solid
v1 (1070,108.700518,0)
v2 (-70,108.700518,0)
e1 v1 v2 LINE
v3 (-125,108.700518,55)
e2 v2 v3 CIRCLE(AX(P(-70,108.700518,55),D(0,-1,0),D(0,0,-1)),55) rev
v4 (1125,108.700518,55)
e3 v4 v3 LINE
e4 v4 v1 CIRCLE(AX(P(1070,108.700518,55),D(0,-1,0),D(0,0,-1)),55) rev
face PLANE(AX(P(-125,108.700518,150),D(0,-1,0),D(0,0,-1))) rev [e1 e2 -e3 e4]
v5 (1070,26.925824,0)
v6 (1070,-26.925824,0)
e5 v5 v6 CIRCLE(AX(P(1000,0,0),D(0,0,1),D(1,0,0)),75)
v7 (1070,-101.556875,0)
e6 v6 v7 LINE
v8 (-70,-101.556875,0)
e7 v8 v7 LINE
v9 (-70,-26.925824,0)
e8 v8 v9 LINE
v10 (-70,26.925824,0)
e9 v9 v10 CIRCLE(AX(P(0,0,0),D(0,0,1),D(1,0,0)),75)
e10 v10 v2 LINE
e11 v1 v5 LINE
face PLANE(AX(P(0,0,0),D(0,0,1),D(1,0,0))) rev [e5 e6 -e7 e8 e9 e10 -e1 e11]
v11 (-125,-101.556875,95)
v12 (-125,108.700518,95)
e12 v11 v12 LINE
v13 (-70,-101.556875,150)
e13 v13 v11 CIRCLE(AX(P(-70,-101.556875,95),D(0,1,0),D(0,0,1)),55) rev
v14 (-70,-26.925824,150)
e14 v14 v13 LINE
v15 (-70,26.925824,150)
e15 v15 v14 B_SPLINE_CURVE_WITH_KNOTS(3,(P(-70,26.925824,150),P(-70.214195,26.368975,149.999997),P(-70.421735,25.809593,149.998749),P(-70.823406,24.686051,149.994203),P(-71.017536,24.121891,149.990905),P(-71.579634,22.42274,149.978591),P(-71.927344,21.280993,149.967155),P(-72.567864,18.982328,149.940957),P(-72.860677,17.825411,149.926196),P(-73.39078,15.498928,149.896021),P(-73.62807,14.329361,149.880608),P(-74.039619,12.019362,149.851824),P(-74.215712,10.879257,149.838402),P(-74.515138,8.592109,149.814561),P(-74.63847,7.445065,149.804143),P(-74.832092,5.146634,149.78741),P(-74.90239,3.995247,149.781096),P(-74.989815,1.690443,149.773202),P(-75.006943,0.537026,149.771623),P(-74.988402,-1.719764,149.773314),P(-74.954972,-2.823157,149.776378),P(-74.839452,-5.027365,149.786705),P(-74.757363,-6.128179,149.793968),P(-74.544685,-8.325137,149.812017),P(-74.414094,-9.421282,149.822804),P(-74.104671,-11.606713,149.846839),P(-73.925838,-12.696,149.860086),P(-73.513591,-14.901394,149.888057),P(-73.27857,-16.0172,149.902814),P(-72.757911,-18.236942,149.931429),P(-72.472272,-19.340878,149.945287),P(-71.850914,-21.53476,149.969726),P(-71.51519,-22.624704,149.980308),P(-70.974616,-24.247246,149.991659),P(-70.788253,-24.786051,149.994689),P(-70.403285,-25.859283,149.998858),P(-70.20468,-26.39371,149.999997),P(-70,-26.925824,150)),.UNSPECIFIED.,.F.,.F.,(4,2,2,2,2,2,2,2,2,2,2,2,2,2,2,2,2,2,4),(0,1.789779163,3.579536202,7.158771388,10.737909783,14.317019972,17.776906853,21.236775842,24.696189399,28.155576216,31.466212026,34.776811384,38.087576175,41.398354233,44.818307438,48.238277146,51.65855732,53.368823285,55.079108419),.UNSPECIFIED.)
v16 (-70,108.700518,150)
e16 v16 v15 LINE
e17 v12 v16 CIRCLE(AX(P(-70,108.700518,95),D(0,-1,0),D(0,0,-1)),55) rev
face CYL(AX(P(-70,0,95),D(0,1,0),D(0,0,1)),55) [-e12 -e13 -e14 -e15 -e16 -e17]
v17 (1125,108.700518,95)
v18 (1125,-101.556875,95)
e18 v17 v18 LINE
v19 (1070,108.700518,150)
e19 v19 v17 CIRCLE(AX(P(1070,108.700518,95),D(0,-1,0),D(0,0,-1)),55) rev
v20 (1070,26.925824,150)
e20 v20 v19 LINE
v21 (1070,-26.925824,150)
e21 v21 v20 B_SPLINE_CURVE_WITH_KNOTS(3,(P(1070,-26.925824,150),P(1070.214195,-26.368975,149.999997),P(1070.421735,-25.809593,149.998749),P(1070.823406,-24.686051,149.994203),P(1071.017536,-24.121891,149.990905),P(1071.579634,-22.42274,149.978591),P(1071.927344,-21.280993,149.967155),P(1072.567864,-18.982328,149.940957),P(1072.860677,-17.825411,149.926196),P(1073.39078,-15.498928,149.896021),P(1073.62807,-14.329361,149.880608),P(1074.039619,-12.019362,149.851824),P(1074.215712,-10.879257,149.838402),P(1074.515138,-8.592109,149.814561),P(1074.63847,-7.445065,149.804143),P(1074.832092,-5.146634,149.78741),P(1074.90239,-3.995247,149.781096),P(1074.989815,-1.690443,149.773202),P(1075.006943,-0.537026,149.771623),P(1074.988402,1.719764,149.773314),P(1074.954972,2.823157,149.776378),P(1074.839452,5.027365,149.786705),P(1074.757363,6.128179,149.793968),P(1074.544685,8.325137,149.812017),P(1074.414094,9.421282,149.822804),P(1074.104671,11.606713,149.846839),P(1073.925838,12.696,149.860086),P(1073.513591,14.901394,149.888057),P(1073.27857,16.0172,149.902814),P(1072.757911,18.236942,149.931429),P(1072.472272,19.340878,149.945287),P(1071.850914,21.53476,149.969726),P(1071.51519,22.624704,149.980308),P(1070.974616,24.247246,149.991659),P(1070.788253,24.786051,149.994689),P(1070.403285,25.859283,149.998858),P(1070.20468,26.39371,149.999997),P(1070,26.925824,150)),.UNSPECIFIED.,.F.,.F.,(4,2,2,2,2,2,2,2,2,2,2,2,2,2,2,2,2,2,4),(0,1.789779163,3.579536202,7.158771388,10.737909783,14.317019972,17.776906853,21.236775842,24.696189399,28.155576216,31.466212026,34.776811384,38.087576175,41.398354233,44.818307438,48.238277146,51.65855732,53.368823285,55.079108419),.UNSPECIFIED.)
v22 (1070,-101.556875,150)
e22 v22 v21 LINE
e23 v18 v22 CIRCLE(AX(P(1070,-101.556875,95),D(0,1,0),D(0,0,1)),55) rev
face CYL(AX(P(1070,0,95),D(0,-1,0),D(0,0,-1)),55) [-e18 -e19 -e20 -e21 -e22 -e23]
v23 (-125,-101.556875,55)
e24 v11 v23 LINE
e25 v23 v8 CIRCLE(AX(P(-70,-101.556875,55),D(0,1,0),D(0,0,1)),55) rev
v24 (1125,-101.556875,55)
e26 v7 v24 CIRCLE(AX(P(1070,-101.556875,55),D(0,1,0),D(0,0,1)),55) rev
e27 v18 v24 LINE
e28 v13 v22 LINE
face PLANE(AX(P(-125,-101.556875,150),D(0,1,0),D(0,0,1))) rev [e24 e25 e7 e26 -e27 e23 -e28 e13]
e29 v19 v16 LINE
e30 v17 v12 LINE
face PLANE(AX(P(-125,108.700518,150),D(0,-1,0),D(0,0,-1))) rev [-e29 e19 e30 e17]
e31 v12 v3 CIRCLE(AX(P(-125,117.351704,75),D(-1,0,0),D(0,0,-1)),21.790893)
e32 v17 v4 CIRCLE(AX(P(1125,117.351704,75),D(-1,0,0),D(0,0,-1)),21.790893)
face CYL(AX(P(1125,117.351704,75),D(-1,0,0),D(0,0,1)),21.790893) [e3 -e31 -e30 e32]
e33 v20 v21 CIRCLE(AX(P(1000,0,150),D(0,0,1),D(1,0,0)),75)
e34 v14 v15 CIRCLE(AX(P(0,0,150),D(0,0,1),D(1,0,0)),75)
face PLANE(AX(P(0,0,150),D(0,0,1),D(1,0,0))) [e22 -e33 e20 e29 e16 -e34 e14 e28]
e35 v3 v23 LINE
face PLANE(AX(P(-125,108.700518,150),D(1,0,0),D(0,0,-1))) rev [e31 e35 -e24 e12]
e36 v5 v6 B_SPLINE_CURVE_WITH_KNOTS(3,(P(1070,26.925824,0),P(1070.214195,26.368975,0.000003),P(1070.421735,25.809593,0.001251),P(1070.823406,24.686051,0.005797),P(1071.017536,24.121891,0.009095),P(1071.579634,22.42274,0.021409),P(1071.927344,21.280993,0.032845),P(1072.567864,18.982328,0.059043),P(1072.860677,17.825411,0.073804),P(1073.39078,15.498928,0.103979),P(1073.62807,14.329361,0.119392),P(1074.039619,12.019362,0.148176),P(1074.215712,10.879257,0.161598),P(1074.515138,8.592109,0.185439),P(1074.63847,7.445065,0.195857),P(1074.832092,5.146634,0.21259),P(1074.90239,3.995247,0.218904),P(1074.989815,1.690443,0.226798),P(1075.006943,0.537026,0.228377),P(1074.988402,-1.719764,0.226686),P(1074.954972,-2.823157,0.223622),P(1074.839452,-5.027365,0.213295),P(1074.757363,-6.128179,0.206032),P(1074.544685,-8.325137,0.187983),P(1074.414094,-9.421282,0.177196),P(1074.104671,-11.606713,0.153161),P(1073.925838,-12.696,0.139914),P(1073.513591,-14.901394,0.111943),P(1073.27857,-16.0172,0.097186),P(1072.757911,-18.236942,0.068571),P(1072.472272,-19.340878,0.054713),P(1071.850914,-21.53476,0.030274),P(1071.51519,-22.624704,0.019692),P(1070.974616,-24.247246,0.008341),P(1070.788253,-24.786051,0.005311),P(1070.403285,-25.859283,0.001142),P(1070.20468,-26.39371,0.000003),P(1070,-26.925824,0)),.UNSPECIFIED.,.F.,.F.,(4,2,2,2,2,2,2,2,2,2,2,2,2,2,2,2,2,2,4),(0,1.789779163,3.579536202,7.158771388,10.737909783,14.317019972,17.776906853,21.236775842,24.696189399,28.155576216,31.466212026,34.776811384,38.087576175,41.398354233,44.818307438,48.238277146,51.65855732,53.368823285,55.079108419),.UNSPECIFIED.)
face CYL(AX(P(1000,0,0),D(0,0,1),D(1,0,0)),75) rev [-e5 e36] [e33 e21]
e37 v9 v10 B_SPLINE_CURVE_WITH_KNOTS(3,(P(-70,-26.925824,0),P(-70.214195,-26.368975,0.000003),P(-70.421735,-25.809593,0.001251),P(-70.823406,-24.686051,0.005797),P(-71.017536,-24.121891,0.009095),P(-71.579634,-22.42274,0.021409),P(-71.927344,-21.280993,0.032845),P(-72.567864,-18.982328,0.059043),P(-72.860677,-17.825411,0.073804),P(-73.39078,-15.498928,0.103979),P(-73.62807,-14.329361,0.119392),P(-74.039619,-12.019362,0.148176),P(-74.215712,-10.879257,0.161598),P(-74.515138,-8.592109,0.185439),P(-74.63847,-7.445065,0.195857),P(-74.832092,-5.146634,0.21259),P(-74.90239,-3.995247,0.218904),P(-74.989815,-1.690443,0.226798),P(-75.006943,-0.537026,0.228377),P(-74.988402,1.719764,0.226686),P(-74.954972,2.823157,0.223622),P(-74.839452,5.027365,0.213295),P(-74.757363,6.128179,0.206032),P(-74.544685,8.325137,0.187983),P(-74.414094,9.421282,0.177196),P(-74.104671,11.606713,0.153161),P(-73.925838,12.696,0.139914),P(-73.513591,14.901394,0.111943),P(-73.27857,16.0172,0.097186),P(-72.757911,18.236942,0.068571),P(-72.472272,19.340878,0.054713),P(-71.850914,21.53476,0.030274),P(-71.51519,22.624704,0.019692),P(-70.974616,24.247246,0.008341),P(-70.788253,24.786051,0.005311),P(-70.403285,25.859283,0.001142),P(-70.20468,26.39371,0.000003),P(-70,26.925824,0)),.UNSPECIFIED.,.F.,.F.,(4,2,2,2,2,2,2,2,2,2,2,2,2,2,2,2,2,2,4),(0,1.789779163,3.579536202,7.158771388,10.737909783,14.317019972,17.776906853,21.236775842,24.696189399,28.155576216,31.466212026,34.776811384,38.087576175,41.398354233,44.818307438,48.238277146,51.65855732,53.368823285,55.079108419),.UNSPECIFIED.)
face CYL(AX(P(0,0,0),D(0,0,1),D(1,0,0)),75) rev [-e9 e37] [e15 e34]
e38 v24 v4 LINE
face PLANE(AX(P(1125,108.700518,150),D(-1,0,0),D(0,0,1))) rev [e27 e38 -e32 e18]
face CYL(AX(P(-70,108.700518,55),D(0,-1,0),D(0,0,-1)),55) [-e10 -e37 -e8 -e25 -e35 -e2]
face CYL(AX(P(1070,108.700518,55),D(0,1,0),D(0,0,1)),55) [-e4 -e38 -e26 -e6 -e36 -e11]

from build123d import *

# Parameters (mm, degrees)
SKETCH1_W           = 1250
SKETCH1_H           = 210.257392811
BOSS_EXTRUDE1_DEPTH = 150
SKETCH2_R           = 75
CUT_EXTRUDE1_DEPTH  = 150
FILLET3_R           = 55
BOSS_EXTRUDE2_DEPTH = 1250


with BuildPart() as part:
    # Sketch1 → Boss-Extrude1 (new body)
    with BuildSketch(Plane.XY):
        with Locations((500, 3.571821645)):
            Rectangle(SKETCH1_W, SKETCH1_H)
    extrude(amount=BOSS_EXTRUDE1_DEPTH)

    # Sketch2 → Cut-Extrude1 (cut)
    with BuildSketch(Plane.XY.offset(150)):
        Circle(SKETCH2_R)
        with Locations((1000, 0)):
            Circle(SKETCH2_R)
    extrude(amount=-CUT_EXTRUDE1_DEPTH, mode=Mode.SUBTRACT)

    # Fillet3
    # the kernel refuses this fillet: 55 mm, written as the material it takes off along each edge
    with BuildSketch(Plane(origin=(1125, 246.20051805, 150), x_dir=(0, 0, -1), z_dir=(0, -1, 0)), Plane(origin=(-125, -239.056874761, 150), x_dir=(0, 0, -1), z_dir=(0, 1, 0))) as fillet3_piece_1:
        with BuildLine():
            CenterArc((FILLET3_R, -FILLET3_R), FILLET3_R, 90, 90)
            Line((0, -FILLET3_R), (0, 0))
            Line((0, 0), (FILLET3_R, 0))
        make_face()
    extrude(amount=485.257392811, mode=Mode.SUBTRACT)
    with BuildSketch(Plane(origin=(1125, 246.20051805, 0), x_dir=(0, 0, 1), z_dir=(0, -1, 0)), Plane(origin=(-125, -239.056874761, 0), x_dir=(0, 0, 1), z_dir=(0, 1, 0))) as fillet3_piece_2:
        with BuildLine():
            CenterArc((FILLET3_R, FILLET3_R), FILLET3_R, 180, 90)
            Line((0, FILLET3_R), (0, 0))
            Line((0, 0), (FILLET3_R, 0))
        make_face()
    extrude(amount=485.257392811, mode=Mode.SUBTRACT)

    # Sketch3 → Boss-Extrude2 (add, through all)
    with BuildSketch(Plane.ZY.offset(125)):
        with BuildLine():
            Line((95, 108.70051805), (55, 108.70051805))
            ThreePointArc((55, 108.70051805), (75, 139.142597248), (95, 108.70051805))
        make_face()
    extrude(amount=-BOSS_EXTRUDE2_DEPTH)


solid = part.part
